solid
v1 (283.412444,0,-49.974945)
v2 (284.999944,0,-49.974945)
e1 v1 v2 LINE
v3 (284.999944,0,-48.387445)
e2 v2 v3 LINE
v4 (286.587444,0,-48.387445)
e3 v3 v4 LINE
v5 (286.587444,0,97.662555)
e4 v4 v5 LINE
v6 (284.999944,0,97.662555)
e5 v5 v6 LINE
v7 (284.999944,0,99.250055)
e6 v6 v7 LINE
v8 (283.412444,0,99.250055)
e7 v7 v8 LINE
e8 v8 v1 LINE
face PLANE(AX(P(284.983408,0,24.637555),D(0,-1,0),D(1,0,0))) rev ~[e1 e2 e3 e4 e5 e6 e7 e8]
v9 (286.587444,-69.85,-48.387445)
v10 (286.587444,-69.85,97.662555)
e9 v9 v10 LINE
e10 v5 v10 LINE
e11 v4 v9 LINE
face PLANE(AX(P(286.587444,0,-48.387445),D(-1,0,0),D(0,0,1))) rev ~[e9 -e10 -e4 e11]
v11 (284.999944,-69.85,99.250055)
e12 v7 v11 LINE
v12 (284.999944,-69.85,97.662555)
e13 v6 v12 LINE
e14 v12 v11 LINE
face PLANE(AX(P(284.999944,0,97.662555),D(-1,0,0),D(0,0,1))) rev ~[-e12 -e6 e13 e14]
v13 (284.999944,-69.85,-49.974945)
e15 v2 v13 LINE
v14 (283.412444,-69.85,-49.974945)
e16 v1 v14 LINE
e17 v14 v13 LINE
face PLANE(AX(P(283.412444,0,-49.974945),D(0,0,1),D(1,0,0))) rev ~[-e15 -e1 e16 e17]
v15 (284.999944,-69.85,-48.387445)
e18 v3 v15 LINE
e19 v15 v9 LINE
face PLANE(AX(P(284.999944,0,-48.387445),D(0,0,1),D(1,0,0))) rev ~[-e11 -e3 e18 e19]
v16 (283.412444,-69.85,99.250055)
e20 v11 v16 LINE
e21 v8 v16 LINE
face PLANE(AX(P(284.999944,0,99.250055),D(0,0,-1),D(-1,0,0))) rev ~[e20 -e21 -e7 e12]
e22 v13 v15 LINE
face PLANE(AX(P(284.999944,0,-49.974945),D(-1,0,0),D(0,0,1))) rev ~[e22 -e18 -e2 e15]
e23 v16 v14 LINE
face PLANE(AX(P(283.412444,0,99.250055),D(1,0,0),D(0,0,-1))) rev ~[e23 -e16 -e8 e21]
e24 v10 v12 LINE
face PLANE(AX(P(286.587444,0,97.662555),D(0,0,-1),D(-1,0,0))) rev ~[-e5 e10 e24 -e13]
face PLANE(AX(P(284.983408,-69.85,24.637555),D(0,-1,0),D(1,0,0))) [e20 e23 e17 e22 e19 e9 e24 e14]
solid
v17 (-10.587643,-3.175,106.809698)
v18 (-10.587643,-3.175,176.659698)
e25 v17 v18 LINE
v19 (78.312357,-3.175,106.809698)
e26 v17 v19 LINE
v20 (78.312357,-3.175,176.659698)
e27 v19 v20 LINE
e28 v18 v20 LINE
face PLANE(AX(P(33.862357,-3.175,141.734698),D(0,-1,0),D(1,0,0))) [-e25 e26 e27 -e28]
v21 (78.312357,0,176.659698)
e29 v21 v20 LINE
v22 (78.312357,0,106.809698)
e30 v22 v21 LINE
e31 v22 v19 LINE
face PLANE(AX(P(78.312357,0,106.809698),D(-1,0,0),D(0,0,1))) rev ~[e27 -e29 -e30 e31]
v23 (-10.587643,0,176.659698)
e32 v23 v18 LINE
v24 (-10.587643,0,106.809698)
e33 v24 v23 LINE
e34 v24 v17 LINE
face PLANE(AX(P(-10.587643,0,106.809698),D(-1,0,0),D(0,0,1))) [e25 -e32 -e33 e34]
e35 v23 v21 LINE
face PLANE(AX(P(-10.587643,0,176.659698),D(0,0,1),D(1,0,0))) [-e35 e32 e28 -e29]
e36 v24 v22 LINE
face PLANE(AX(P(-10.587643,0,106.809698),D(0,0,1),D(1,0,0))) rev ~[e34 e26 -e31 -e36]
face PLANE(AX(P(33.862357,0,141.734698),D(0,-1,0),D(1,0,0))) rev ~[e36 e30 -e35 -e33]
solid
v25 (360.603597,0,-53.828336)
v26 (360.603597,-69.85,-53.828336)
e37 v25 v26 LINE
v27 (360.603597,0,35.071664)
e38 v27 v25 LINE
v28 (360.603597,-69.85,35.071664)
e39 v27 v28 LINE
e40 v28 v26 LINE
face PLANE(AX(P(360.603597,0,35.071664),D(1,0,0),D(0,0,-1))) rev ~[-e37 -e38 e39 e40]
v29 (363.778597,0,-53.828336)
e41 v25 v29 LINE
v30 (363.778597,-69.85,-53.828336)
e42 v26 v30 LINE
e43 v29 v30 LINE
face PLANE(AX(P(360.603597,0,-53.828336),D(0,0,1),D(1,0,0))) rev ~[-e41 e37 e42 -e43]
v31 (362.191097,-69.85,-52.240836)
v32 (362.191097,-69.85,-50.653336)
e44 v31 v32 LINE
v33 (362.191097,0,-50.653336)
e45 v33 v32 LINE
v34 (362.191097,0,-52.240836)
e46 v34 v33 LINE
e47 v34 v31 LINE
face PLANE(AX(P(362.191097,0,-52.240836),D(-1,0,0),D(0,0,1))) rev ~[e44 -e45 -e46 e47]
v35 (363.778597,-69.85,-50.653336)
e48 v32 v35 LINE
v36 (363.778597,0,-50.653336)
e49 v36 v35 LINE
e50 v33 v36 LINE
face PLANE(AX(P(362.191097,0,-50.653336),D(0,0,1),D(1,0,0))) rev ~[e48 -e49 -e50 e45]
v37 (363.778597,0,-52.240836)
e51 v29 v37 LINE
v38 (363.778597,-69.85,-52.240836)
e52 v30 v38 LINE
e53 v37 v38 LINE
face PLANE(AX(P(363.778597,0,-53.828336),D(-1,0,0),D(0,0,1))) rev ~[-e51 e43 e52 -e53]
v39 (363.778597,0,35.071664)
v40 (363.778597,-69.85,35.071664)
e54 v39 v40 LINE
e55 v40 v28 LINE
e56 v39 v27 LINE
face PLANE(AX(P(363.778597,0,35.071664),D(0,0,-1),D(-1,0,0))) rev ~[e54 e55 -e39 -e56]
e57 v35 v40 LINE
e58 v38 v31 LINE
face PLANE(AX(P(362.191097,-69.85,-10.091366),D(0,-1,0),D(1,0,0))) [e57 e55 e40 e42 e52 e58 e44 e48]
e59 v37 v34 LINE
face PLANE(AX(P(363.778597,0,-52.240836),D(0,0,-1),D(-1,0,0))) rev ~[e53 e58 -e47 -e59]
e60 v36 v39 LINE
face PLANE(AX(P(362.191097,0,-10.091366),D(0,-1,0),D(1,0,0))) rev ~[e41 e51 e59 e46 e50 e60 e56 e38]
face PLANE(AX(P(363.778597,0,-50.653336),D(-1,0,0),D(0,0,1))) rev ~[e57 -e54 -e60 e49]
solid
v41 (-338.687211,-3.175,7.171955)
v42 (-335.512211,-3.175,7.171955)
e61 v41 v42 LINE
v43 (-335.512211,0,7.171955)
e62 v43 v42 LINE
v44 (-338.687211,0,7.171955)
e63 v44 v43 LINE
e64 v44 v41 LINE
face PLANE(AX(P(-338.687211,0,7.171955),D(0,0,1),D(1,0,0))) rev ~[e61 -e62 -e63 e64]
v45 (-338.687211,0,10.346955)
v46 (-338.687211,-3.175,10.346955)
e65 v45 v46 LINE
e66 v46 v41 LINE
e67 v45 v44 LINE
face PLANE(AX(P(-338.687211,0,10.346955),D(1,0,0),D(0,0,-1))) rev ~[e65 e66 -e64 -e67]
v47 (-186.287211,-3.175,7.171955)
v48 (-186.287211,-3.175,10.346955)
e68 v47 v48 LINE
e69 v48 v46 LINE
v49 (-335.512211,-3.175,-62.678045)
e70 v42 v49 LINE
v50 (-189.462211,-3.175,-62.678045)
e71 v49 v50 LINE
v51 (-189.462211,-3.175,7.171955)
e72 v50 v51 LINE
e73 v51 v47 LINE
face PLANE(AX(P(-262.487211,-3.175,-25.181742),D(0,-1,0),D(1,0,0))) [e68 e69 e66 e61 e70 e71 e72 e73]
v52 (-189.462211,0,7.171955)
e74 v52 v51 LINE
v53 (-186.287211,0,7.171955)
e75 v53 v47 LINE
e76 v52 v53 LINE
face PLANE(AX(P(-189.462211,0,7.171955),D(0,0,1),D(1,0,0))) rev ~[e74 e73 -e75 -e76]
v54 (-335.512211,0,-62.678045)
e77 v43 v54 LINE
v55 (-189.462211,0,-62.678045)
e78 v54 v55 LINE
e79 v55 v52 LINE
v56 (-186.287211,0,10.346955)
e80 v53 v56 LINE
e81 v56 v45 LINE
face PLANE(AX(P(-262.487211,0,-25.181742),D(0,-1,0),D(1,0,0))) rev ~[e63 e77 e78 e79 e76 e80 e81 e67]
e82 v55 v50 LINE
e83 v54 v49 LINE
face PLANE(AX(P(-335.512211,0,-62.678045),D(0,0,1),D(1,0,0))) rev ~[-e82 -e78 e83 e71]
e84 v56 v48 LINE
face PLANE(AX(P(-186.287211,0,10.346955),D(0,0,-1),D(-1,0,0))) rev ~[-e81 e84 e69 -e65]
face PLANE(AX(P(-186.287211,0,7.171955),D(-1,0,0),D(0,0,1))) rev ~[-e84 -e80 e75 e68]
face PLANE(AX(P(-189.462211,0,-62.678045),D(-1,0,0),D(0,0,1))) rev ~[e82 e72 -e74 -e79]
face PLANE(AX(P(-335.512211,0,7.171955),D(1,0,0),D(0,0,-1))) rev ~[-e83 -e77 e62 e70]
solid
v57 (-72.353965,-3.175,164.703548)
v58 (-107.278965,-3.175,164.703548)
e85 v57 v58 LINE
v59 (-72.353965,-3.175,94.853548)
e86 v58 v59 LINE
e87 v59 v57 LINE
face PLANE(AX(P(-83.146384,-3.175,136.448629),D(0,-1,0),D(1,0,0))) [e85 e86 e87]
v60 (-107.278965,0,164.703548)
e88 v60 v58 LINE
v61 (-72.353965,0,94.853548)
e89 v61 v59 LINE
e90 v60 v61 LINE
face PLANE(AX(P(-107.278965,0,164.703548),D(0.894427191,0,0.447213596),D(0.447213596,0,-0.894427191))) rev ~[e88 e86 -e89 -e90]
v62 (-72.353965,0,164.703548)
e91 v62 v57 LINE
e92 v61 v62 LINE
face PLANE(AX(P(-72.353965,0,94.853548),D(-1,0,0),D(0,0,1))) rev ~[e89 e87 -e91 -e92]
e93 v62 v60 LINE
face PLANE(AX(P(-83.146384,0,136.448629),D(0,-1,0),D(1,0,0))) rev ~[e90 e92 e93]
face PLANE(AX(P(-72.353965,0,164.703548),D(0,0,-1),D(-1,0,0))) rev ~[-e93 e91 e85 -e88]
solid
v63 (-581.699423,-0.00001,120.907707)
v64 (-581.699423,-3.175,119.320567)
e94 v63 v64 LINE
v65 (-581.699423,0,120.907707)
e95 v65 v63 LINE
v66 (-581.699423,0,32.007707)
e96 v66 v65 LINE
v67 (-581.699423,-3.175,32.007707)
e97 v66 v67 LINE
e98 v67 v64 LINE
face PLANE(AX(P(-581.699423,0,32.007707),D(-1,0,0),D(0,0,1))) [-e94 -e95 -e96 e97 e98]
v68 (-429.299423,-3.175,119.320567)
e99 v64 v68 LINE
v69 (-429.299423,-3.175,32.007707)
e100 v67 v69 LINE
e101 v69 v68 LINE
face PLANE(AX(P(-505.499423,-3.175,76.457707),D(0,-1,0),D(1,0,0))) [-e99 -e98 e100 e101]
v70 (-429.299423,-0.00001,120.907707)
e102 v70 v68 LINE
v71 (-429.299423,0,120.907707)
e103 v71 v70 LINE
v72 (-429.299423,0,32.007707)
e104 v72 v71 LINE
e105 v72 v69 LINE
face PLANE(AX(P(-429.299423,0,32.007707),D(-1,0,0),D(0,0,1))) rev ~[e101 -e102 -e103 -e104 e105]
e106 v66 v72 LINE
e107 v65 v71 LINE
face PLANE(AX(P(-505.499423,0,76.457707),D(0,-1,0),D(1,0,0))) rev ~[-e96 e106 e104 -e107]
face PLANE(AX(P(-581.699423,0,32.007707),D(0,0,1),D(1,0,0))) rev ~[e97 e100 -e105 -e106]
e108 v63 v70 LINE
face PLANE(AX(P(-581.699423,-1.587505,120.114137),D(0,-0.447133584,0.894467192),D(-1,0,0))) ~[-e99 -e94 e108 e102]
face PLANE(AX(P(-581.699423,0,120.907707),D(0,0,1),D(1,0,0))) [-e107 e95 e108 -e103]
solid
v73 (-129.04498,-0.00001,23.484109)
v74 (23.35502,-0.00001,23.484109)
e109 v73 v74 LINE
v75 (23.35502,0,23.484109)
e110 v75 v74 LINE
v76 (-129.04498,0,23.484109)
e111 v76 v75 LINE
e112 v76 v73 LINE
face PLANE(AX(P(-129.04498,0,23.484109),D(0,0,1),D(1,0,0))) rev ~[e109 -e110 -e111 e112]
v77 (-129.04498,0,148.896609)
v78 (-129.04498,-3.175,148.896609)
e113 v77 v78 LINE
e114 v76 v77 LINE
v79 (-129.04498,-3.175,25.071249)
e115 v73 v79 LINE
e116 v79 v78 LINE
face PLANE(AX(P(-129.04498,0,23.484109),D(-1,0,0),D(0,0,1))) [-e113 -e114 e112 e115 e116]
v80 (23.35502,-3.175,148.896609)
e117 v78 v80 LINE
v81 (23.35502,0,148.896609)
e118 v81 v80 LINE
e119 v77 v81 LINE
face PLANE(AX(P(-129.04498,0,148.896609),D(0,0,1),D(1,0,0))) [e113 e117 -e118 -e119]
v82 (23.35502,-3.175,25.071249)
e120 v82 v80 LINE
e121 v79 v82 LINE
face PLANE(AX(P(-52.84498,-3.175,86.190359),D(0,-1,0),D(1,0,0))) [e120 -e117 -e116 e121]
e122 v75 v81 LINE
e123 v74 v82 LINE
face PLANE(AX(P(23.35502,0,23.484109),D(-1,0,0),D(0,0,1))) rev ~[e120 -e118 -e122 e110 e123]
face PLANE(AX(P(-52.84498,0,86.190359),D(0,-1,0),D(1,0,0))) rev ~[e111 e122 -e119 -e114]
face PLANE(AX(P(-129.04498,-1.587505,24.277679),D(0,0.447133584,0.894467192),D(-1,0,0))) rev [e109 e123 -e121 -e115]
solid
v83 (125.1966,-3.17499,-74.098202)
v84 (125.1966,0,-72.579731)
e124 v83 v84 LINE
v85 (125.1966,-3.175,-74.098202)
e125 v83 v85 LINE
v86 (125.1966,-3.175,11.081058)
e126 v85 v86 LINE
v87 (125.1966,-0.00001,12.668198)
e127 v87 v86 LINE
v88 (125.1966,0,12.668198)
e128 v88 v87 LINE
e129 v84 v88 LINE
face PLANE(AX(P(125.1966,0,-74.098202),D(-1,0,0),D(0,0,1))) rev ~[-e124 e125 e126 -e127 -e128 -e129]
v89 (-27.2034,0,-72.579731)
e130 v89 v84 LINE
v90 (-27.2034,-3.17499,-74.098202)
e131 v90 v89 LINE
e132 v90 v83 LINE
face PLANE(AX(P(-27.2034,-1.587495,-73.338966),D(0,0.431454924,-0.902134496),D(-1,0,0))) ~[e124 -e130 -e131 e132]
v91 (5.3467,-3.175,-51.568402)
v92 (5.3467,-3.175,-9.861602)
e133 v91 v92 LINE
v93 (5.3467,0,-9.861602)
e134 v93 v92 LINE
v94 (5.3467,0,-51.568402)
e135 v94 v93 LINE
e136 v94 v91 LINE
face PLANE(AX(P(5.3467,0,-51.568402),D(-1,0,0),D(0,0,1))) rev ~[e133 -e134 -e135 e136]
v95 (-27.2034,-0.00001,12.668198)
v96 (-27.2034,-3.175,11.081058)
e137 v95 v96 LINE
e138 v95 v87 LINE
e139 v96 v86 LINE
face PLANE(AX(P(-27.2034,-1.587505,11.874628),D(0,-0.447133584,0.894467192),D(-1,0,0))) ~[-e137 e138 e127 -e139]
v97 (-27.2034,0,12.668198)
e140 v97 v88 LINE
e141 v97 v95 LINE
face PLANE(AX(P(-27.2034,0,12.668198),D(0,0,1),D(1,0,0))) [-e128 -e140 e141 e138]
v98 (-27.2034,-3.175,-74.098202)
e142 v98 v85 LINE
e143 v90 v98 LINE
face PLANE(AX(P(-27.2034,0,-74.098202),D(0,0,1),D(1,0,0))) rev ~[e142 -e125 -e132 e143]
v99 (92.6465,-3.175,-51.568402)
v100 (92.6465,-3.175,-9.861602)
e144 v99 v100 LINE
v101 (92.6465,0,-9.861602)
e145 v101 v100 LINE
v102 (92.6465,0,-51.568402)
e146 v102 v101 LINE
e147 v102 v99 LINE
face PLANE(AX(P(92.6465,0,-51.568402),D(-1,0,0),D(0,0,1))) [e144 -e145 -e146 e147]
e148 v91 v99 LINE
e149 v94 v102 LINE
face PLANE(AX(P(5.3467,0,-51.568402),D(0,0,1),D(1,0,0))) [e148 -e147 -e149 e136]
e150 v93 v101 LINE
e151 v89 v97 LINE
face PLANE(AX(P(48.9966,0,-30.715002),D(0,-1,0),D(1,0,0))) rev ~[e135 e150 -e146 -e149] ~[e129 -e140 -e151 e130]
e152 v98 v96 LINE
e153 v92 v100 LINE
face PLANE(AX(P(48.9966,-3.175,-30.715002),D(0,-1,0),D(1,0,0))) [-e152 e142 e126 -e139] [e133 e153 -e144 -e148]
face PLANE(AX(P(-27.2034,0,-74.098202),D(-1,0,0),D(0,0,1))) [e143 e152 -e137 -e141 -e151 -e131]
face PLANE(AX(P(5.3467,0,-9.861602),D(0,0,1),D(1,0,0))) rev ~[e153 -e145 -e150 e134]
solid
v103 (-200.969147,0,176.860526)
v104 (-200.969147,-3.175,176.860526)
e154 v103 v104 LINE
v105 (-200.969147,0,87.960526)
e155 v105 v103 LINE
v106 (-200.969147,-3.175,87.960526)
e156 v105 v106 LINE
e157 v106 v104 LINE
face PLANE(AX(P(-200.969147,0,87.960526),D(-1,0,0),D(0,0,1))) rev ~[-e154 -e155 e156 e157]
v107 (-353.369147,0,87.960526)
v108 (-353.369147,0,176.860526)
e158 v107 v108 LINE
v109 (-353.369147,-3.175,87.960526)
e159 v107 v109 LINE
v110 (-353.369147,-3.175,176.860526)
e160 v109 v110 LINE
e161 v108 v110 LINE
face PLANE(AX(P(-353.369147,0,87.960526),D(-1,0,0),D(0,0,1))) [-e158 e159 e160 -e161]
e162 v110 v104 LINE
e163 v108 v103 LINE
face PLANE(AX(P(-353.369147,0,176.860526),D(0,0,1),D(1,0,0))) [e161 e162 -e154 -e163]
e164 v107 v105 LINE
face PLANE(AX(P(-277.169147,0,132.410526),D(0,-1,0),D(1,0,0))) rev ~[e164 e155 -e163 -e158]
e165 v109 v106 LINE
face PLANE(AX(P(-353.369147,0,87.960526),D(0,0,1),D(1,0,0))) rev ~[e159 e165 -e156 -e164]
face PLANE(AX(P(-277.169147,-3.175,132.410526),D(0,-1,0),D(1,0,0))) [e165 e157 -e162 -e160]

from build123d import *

# Parameters (mm, degrees)
F0_W      = 152.4
F0_H      = 86.7664
F0_W_2    = 87.2998
F0_H_2    = 41.7068
F1_DEPTH  = 3.175
F2_W      = 152.4
F2_H      = 125.4125
F3_DEPTH  = 3.175
F5_DEPTH  = 3.175
F6_W      = 152.4
F6_H      = 88.9
F7_DEPTH  = 3.175
F9_DEPTH  = 3.175
F10_W     = 88.9
F10_H     = 69.85
F11_DEPTH = 3.175
F12_SIZE2 = 1.518471
F12_SIZE  = 3.17499
F13_SIZE2 = 1.58714
F13_SIZE  = 3.17499
F14_W     = 152.4
F14_H     = 88.9
F15_DEPTH = 3.175
F16_SIZE2 = 1.58714
F16_SIZE  = 3.17499
F17_SIZE2 = 1.58714
F17_SIZE  = 3.17499
F19_DEPTH = 69.85
F21_DEPTH = 69.85


# Not quite as in the source:
# - a fillet or chamfer is up to 0.001 mm smaller than in the source, because OpenCascade refuses the exact size


with BuildPart() as f1:
    # F0 (on Front) → F1 (new body)
    with BuildSketch(Plane.XZ):
        with Locations((48.9966, -30.7150018784)):
            Rectangle(F0_W, F0_H)
        with Locations((48.9966, -30.7150018784)):
            Rectangle(F0_W_2, F0_H_2, mode=Mode.SUBTRACT)
    extrude(amount=F1_DEPTH)

    # F12 (size 3.175 and 1.5184806323 in the source; OpenCascade refuses exactly that, so slightly less here)
    f12_edges = [f1.edges().sort_by_distance(p)[0] for p in [
        (48.9966, 0, -74.098202),
    ]]
    f12_side = f1.faces().sort_by_distance((48.9966, -1.5875, -74.098202))[0]
    chamfer(f12_edges, length=F12_SIZE, length2=F12_SIZE2, reference=f12_side)

    # F13 (size 3.175 and 1.5871501317 in the source; OpenCascade refuses exactly that, so slightly less here)
    f13_edges = [f1.edges().sort_by_distance(p)[0] for p in [
        (48.9966, -3.175, 12.668198),
    ]]
    f13_side = f1.faces().sort_by_distance((48.9966, -1.5875, 12.668198))[0]
    chamfer(f13_edges, length=F13_SIZE, length2=F13_SIZE2, reference=f13_side)


with BuildPart() as f3:
    # F2 (on Front) → F3 (new body)
    with BuildSketch(Plane.XZ):
        with Locations((-52.8449798107, 86.1903589696)):
            Rectangle(F2_W, F2_H)
    extrude(amount=F3_DEPTH)

    # F17 (size 3.175 and 1.5871501317 in the source; OpenCascade refuses exactly that, so slightly less here)
    f17_edges = [f3.edges().sort_by_distance(p)[0] for p in [
        (-52.84498, -3.175, 23.484109),
    ]]
    f17_side = f3.faces().sort_by_distance((-52.84498, -1.5875, 23.484109))[0]
    chamfer(f17_edges, length=F17_SIZE, length2=F17_SIZE2, reference=f17_side)


with BuildPart() as f5:
    # F4 (on Front) → F5 (new body)
    with BuildSketch(Plane.XZ):
        Polygon((-335.5122112751, -62.6780449331), (-189.4622112751, -62.6780449331), (-189.4622112751, 7.1719550669), (-186.2872112751, 7.1719550669), (-186.2872112751, 10.3469550669), (-338.6872112751, 10.3469550669), (-338.6872112751, 7.1719550669), (-335.5122112751, 7.1719550669), align=None)
    extrude(amount=F5_DEPTH)


with BuildPart() as f7:
    # F6 (on Front) → F7 (new body)
    with BuildSketch(Plane.XZ):
        with Locations((-277.1691465855, 132.4105263472)):
            Rectangle(F6_W, F6_H)
    extrude(amount=F7_DEPTH)


with BuildPart() as f9:
    # F8 (on Front) → F9 (new body)
    with BuildSketch(Plane.XZ):
        Polygon((-107.2789654136, 164.7035479546), (-72.3539654136, 94.8535479546), (-72.3539654136, 164.7035479546), align=None)
    extrude(amount=F9_DEPTH)


with BuildPart() as f11:
    # F10 (on Front) → F11 (new body)
    with BuildSketch(Plane.XZ):
        with Locations((33.8623570919, 141.7346980453)):
            Rectangle(F10_W, F10_H)
    extrude(amount=F11_DEPTH)


with BuildPart() as f15:
    # F14 (on Front) → F15 (new body)
    with BuildSketch(Plane.XZ):
        with Locations((-505.4994225502, 76.4577066326)):
            Rectangle(F14_W, F14_H)
    extrude(amount=F15_DEPTH)

    # F16 (size 3.175 and 1.5871501317 in the source; OpenCascade refuses exactly that, so slightly less here)
    f16_edges = [f15.edges().sort_by_distance(p)[0] for p in [
        (-505.499423, -3.175, 120.907707),
    ]]
    f16_side = f15.faces().sort_by_distance((-505.499423, -1.5875, 120.907707))[0]
    chamfer(f16_edges, length=F16_SIZE, length2=F16_SIZE2, reference=f16_side)


with BuildPart() as f19:
    # F18 (on Front) → F19 (new body)
    with BuildSketch(Plane.XZ):
        Polygon((363.7785966866, 35.07166363), (360.6035966866, 35.07166363), (360.6035966866, -53.82833637), (363.7785966866, -53.82833637), (363.7785966866, -52.24083637), (362.1910966866, -52.24083637), (362.1910966866, -50.65333637), (363.7785966866, -50.65333637), align=None)
    extrude(amount=F19_DEPTH)


with BuildPart() as f21:
    # F20 (on Front) → F21 (new body)
    with BuildSketch(Plane.XZ):
        Polygon((284.9999441053, 97.662555486), (284.9999441053, 99.250055486), (283.4124441053, 99.250055486), (283.4124441053, -49.974944514), (284.9999441053, -49.974944514), (284.9999441053, -48.387444514), (286.5874441053, -48.387444514), (286.5874441053, 97.662555486), align=None)
    extrude(amount=F21_DEPTH)


solid = Compound([f1.part, f3.part, f5.part, f7.part, f9.part, f11.part, f15.part, f19.part, f21.part])
